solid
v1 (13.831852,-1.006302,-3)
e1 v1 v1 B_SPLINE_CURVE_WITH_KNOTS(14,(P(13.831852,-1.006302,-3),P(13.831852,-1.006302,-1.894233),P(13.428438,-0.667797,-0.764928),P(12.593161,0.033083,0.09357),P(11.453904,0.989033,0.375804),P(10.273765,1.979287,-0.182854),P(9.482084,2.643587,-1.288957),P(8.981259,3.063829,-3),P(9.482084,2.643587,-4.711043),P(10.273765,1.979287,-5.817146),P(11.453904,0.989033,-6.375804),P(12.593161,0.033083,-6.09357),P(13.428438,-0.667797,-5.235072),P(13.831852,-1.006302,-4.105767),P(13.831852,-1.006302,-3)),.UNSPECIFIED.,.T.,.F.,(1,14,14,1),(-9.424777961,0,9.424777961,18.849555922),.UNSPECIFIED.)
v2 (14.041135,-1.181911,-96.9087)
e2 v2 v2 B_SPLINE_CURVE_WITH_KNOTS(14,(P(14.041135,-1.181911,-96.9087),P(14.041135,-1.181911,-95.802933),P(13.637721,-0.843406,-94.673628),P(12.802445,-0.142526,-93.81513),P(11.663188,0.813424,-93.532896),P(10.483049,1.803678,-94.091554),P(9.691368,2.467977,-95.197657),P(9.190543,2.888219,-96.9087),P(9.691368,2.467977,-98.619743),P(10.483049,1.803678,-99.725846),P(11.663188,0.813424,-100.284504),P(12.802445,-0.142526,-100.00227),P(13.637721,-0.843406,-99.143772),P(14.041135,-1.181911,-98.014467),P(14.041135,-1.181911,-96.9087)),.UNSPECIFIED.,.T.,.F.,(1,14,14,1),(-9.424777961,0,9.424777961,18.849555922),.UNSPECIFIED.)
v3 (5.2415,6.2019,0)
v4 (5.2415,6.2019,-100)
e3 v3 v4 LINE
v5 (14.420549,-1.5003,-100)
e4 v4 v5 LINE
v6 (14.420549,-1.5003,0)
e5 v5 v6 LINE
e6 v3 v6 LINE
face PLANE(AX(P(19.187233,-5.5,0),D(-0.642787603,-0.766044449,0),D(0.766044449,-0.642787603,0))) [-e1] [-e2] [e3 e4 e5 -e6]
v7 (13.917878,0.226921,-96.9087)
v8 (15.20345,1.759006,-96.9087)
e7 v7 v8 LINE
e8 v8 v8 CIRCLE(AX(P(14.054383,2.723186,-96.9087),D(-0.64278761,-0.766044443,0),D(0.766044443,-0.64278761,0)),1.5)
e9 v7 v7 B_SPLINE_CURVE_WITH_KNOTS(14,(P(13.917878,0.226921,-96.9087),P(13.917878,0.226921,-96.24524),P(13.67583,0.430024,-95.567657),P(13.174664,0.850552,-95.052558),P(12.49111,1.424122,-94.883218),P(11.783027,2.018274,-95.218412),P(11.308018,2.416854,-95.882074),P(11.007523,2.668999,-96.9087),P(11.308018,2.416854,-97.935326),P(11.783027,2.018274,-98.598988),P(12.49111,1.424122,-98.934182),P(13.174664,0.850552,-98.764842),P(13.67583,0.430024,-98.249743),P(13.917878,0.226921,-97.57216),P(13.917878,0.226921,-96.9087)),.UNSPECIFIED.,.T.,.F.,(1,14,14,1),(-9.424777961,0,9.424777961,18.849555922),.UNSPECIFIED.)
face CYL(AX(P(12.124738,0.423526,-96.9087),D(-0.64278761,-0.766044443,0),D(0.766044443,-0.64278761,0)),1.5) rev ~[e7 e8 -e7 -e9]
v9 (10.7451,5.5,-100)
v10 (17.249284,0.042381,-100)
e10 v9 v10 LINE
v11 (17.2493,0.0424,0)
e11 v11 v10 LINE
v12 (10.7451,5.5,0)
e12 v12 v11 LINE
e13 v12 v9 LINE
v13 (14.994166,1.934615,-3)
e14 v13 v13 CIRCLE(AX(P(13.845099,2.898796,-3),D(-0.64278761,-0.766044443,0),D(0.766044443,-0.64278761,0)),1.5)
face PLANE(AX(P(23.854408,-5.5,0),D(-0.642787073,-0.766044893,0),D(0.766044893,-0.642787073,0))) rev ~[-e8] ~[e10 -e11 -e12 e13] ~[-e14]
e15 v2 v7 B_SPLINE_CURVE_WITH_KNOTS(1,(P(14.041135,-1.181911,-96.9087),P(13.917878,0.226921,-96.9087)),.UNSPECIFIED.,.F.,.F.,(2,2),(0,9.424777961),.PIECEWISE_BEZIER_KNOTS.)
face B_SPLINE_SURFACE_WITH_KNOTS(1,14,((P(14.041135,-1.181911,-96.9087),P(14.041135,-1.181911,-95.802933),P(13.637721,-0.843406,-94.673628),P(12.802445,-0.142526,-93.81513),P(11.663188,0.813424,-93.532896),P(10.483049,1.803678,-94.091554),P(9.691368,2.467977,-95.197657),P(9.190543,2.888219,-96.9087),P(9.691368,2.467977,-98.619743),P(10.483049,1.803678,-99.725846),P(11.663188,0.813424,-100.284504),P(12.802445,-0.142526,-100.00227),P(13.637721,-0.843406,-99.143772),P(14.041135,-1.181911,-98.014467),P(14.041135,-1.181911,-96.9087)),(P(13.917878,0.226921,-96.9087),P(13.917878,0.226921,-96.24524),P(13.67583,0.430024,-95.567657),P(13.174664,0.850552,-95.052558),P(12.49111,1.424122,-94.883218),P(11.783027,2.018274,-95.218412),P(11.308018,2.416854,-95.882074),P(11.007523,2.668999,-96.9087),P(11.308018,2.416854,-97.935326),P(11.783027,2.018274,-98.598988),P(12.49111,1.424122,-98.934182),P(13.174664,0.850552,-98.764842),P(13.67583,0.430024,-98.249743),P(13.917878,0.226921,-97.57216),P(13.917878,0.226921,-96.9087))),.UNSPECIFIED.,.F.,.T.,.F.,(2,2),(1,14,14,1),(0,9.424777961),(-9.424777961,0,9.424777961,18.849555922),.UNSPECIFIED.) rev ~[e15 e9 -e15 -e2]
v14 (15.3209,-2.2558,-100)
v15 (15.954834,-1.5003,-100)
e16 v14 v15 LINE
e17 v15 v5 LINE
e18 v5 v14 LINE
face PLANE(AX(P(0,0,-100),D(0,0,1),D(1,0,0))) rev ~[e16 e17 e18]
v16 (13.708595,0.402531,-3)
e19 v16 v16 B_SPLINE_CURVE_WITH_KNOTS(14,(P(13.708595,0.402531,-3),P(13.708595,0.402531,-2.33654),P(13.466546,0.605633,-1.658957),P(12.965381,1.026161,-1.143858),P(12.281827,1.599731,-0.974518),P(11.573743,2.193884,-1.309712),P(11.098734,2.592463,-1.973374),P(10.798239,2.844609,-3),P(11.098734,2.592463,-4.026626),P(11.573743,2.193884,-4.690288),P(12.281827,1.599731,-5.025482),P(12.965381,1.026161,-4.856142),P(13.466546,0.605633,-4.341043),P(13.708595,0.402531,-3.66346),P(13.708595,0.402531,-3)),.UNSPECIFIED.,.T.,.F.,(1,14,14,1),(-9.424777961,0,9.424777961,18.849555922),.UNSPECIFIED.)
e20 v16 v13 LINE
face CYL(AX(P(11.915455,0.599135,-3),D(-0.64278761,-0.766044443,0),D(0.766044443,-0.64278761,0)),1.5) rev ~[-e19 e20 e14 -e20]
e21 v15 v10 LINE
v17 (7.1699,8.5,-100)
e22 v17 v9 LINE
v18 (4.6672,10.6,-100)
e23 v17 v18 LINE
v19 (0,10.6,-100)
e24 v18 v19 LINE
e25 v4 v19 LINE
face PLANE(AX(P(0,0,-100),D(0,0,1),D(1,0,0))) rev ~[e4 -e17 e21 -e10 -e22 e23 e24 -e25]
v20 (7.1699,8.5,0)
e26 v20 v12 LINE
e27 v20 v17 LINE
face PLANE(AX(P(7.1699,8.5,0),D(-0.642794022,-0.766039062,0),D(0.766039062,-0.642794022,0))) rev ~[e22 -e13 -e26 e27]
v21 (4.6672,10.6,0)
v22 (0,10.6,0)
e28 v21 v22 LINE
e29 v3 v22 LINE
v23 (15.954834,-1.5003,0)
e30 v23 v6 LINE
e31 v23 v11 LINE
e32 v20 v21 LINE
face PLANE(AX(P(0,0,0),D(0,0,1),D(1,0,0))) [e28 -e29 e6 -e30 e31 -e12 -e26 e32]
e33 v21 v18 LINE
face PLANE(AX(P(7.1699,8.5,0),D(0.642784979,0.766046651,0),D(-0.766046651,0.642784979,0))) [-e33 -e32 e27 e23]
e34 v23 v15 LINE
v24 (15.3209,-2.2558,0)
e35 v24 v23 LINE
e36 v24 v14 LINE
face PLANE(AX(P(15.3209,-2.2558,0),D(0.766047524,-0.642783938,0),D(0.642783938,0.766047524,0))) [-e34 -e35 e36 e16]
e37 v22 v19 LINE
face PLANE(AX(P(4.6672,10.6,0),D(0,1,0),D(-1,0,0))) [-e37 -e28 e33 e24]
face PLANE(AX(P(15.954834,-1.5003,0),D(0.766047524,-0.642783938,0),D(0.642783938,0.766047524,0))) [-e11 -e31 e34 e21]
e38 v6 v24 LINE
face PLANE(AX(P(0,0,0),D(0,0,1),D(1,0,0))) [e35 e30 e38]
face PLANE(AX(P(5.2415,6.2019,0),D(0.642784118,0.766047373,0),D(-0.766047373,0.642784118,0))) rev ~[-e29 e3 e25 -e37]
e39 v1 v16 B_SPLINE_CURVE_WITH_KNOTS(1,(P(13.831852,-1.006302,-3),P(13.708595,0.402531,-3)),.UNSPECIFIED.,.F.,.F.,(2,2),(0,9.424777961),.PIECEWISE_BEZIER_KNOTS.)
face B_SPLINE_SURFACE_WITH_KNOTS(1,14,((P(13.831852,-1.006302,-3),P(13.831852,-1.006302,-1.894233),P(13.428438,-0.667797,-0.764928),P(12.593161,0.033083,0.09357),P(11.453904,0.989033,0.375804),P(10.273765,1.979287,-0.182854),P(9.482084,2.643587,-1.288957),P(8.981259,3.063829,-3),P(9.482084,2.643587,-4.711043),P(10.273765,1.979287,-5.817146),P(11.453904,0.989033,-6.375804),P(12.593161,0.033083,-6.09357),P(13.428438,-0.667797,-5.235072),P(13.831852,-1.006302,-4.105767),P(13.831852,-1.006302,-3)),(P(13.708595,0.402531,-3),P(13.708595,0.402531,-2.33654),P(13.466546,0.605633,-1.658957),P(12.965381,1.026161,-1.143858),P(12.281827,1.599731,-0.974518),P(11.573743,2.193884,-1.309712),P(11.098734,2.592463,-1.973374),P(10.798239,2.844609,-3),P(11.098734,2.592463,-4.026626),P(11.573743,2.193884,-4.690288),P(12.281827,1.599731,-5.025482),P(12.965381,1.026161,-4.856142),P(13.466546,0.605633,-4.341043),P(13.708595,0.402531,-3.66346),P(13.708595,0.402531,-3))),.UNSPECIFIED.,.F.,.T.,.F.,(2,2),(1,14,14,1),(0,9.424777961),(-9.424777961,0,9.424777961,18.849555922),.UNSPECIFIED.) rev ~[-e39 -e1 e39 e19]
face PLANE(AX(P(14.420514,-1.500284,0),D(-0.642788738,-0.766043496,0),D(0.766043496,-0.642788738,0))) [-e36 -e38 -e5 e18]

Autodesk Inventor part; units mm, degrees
ref_plane "YZ Plane" through (0, 0, 0) normal (1, 0, 0) x (0, 1, 0)
sketch "Sketch1" plane through (0, 0, 0) normal (0, 0, 1) x (1, 0, 0)
  line L0 (10.7451, 5.5) -> (50.1922, -27.6) projected
  line L1 (50.1922, -27.6) -> (100, -27.6) projected
  line L2 (100, -27.6) -> (100, -23.6) projected
  line L3 (100, -23.6) -> (83.9, -23.6) projected
  arc A0 (65.8, -5.5) -> (83.9, -23.6) centre (83.9, -5.5) ccw projected
  line L4 (65.8, -5.5) -> (65.8, 5.5) projected
  line L5 (65.8, 5.5) -> (10.7451, 5.5) projected
  line L6 (7.1699, 8.5) -> (10.7451, 5.5) projected
  line L7 (65.8, 5.5) -> (10.7451, 5.5) projected
  line L8 (65.8, 5.5) -> (65.8, 8.5) projected
  line L9 (65.8, 8.5) -> (7.1699, 8.5) projected
  circle A1 centre (83.9, -5.5) radius 16.1 projected
  line L10 (83.9, 10.6) -> (-17.1951, 10.6)
  line L11 (100, -5.5) -> (0, -5.5)
  line L12 (0, -5.5) -> (0, 10.6)
  line L13 (7.1699, 8.5) -> (4.6672, 10.6)
  line L14 (7.1699, 8.5) -> (5.2415, 6.2019)
  line L15 (5.2415, 6.2019) -> (0, 10.6)
  line L16 (0, 10.6) -> (22.9813, -8.6836)
  line L17 (22.9813, -8.6836) -> (24.9097, -6.3855)
  point P0 (0, 0)
  dimension "d0" = 100
  dimension "d1" = 3
  dimension "d2" = 30
extrude "Extrusion1" add sketch "Sketch1" against normal blind 100 contours L17 L16 L11 L0 | L11 L16 L14 L6 L0 | L14 L15 L10 L13
ref_plane "Work Plane1" through (8.1777, -6.0133, 8.6215) normal (0, -1, 0) x (0, 0, 1)
sketch "Sketch2" plane through (8.1777, -6.0133, 8.6215) normal (0, -1, 0) x (0, 0, 1)
  line L0 (-22.0032, -27.7487) -> (35.8312, 20.7819)
  line L1 (35.8312, 20.7819) -> (3.0626, 38.2053)
  line L2 (3.0626, 38.2053) -> (-26.1922, -24.5344)
  line L3 (-26.1922, -24.5344) -> (-22.0032, -27.7487)
  line L4 (-46.8404, -23.7111) -> (-15.3118, 43.9022)
  line L5 (-15.3118, 43.9022) -> (-51.9953, 38.492)
  line L6 (-51.9953, 38.492) -> (-51.9953, -22.5683)
  line L7 (-51.9953, -22.5683) -> (-46.8404, -23.7111)
  line L8 (-70.2281, -23.6979) -> (-65.0733, -22.5551)
  line L9 (-65.0733, -22.5551) -> (-65.0733, 38.4893)
  line L10 (-94.9551, 29.3293) -> (-70.2281, -23.6979)
  line L11 (-65.0733, 38.4893) -> (-94.9551, 29.3293)
  line L12 (-90.9709, -24.4596) -> (-115.5317, 28.2112)
  arc A0 (-115.5317, 28.2112) -> (-139.4308, 9.4739) centre (-87.2125, -32.5195) ccw
  line L13 (-139.4308, 9.4739) -> (-95.1598, -27.6739)
  line L14 (-95.1598, -27.6739) -> (-90.9709, -24.4596)
  point P0 (-8.6215, 8.1777)
  point P1 (-24.0977, -26.1415)
  point P2 (-49.4178, -23.1397)
  point P3 (-67.6507, -23.1265)
  point P4 (-93.0654, -26.0667)
ref_plane "Work Plane2" through (40.3431, -2.6133, -6) normal (0, -1, 0) x (1, 0, 0)
extrude "Extrusion2" cut sketch "Sketch2" against normal up to surface (3.4 mm away)
extrude "Extrusion3" cut sketch "Sketch2" along normal blind 1
sketch "Sketch3" plane through (15.747, -2.6133, 0) normal (0, -1, 0) x (1, 0, 0)
  line L0 (4.6672, 0) -> (4.6672, -11.8362) projected
  line L1 (0, 0) -> (4.6672, 0) projected
  line L2 (0, -9.66) -> (0, 0) projected
  line L3 (4.6672, -11.8362) -> (0, -9.66) projected
  line L4 (4.6672, -32.8682) -> (4.6672, -43.3737) projected
  line L5 (0, -30.6918) -> (4.6672, -32.8682) projected
  line L6 (0, -43.3737) -> (0, -30.6918) projected
  line L7 (4.6672, -43.3737) -> (0, -43.3737) projected
  line L8 (4.6672, -56.4518) -> (4.6672, -66.9512) projected
  line L9 (0, -56.4518) -> (4.6672, -56.4518) projected
  line L10 (0, -69.1275) -> (0, -56.4518) projected
  line L11 (4.6672, -66.9512) -> (0, -69.1275) projected
  line L12 (4.6672, -88.0491) -> (4.6672, -100) projected
  line L13 (0, -90.2254) -> (4.6672, -88.0491) projected
  line L14 (0, -100) -> (0, -90.2254) projected
  line L15 (4.6672, -100) -> (0, -100) projected
  line L16 (0, -90.2254) -> (12.0968, -84.5846)
  line L17 (0, -90.2254) -> (4.6672, -88.0491) projected
  line L18 (12.0968, -84.5846) -> (12.0968, -100)
  line L19 (4.6672, -100) -> (0, -100) projected
  line L20 (12.0968, -100) -> (0, -100)
  line L21 (8.636, -100) -> (8.636, -86.1984) projected
  line L22 (8.636, -86.1984) -> (9.1627, -85.9528) projected
  line L23 (9.1627, -64.8548) -> (9.1627, -85.9528) projected
  line L24 (9.1627, -64.8548) -> (8.636, -65.1005) projected
  line L25 (8.636, -65.1005) -> (8.636, -56.4518) projected
  line L26 (8.636, -56.4518) -> (9.1627, -56.4518) projected
  line L27 (9.1627, -43.3737) -> (9.1627, -56.4518) projected
  line L28 (9.1627, -43.3737) -> (8.636, -43.3737) projected
  line L29 (8.636, -43.3737) -> (8.636, -34.7188) projected
  line L30 (8.636, -34.7188) -> (9.1627, -34.9645) projected
  line L31 (9.1627, -13.9325) -> (9.1627, -34.9645) projected
  line L32 (9.1627, -13.9325) -> (8.636, -13.6868) projected
  line L33 (8.636, -13.6868) -> (8.636, 0) projected
  line L34 (7.2344, 0) -> (8.636, 0) projected
  line L35 (7.2344, 0) -> (7.2344, -100) projected
  line L36 (8.636, -100) -> (7.2344, -100) projected
  line L37 (0, -30.6918) -> (5.2437, -33.137) projected
  line L38 (5.2437, -33.137) -> (5.2437, -43.3737) projected
  line L39 (5.2437, -43.3737) -> (0, -43.3737) projected
  line L40 (0, -43.3737) -> (0, -30.6918) projected
  line L41 (5.2437, -66.6823) -> (0, -69.1275) projected
  line L42 (0, -69.1275) -> (0, -56.4518) projected
  line L43 (0, -56.4518) -> (5.2437, -56.4518) projected
  line L44 (5.2437, -56.4518) -> (5.2437, -66.6823) projected
  line L45 (5.2437, -87.7803) -> (5.2437, -100) projected
  line L46 (7.2344, -100) -> (5.2437, -100) projected
  line L47 (7.2344, 0) -> (7.2344, -100) projected
  line L48 (5.2437, 0) -> (7.2344, 0) projected
  line L49 (5.2437, 0) -> (5.2437, -12.1051) projected
  line L50 (5.2437, -12.1051) -> (0, -9.66) projected
  line L51 (0, -9.66) -> (0, 0) projected
  line L52 (-15.747, 0) -> (0, 0) projected
  line L53 (-15.747, 0) -> (-15.747, -100) projected
  line L54 (0, -100) -> (-15.747, -100) projected
  line L55 (0, -100) -> (0, -90.2254) projected
  line L56 (0, -90.2254) -> (5.2437, -87.7803) projected
  line L57 (4.6672, -66.9512) -> (0, -69.1275) projected
  line L58 (0, -69.1275) -> (9.1627, -64.8548)
  line L59 (9.1627, -56.4518) -> (4.6672, -56.4518) projected
  line L60 (9.1627, -56.4518) -> (9.1627, -64.8548)
  line L61 (0, -56.4518) -> (9.1627, -56.4518)
  line L62 (0, -43.3737) -> (9.1627, -43.3737)
  line L63 (8.636, -34.7188) -> (9.1627, -34.9645) projected
  line L64 (9.1627, -34.9645) -> (9.1627, -43.3737)
  line L65 (8.636, -43.3737) -> (8.636, -34.7188) projected
  line L66 (0, -30.6918) -> (4.6672, -32.8682) projected
  line L67 (0, -30.6918) -> (9.1627, -34.9645)
  line L68 (4.6672, -11.8362) -> (0, -9.66) projected
  line L69 (4.6672, -11.8362) -> (9.1627, -13.9325)
  line L70 (9.1627, -13.9325) -> (9.1627, 0)
  line L71 (9.1627, 0) -> (0, 0)
  line L72 (4.6672, 0) -> (-11.0798, 0) projected
  line L73 (8.9504, 0) -> (9.1627, -0.253) projected
  line L74 (9.1627, 0) -> (9.1627, -0.253) projected
  line L75 (8.9504, 0) -> (9.1627, 0) projected
  line L76 (9.1627, -99.5783) -> (8.8088, -100) projected
  line L77 (9.1627, -100) -> (8.8088, -100) projected
  line L78 (9.1627, -99.5783) -> (9.1627, -100) projected
  point P0 (-15.747, 0)
  point P1 (8.9504, 0)
  point P2 (5.2437, -12.1051)
  point P3 (7.2344, 0)
  point P4 (5.2437, -33.137)
  point P5 (5.2437, -43.3737)
  point P6 (5.2437, -66.6823)
  point P7 (5.2437, -87.7803)
  point P8 (5.2437, -100)
  point P9 (8.636, -100)
  point P10 (8.636, -86.1984)
extrude "Extrusion4" cut sketch "Sketch3" along normal through all contours L48 L35 L69 L49 | L34 L33 L69 L35 | L67 L29 L62 L35 | L35 L62 L38 L67 | L71 L70 L73 | L59 L25 L58 L35 | L35 L58 L44 L59 | L45 L16 L35 L20 | L16 L21 L20 L35 | L76 L78 L20
sketch "Sketch4" plane through (0, 10.6, -100) normal (-0.6427876, -0.7660444, 0) x (0.7660444, -0.6427876, 0)
  line L0 (30, 34.2459) -> (20.5562, 30.8725) projected
  line L1 (20.5562, 30.8725) -> (20.5562, 43.5482) projected
  line L2 (20.5562, 43.5482) -> (30, 43.5482) projected
  line L3 (30, 56.6263) -> (30, 43.5482) projected
  line L4 (30, 56.6263) -> (20.5562, 56.6263) projected
  line L5 (20.5562, 56.6263) -> (20.5562, 69.3082) projected
  line L6 (20.5562, 69.3082) -> (30, 65.9347) projected
  line L7 (30, 86.9667) -> (30, 65.9347) projected
  line L8 (30, 86.9667) -> (20.5562, 90.34) projected
  line L9 (20.5562, 90.34) -> (20.5562, 100) projected
  line L10 (0, 100) -> (20.5562, 100) projected
  line L11 (0, 100) -> (0, 0) projected
  line L12 (20.5562, 0) -> (0, 0) projected
  line L13 (20.5562, 0) -> (20.5562, 9.7746) projected
  line L14 (20.5562, 9.7746) -> (30, 13.148) projected
  line L15 (30, 34.2459) -> (30, 13.148) projected
  line L16 (73.894, 94) -> (30.9766, 94)
  line L17 (24.1315, 94) -> (11.5095, 94)
  line L18 (31.2695, 94) -> (24.1315, 94)
  line L19 (0, 100) -> (0, 0) projected
  line L20 (0, 50) -> (30, 50.0873)
  line L21 (20.5562, 100) -> (18.5562, 100)
  line L22 (18.5562, 100) -> (18.5562, 94)
  line L23 (18.5562, 94) -> (20.5562, 94)
  line L24 (20.5562, 94) -> (20.5562, 100)
  circle A0 centre (15.5562, 97) radius 3
  circle A1 centre (15.5562, 97) radius 1.5
  circle A2 centre (15.8294, 3.0913) radius 1.5
  point P0 (6.8135, 100)
  dimension "d11" = 2
  dimension "d12" = 3
extrude "Extrusion5" cut sketch "Sketch4" against normal blind 10 contours A1 | A2
chamfer "Chamfer1" distance 1 angle 45 2 edges at (10.9769, 1.3893, -96.9087) (10.7677, 1.5648, -3)
sketch "Szkic5" plane through (15.747, -2.6133, 0) normal (0, -1, 0) x (1, 0, 0)
  line L0 (4.6672, 0) -> (4.6672, -11.8362) projected
  line L1 (0, 0) -> (4.6672, 0) projected
  line L2 (0, -9.66) -> (0, 0) projected
  line L3 (4.6672, -11.8362) -> (0, -9.66) projected
  line L4 (4.6672, -32.8682) -> (4.6672, -43.3737) projected
  line L5 (0, -30.6918) -> (4.6672, -32.8682) projected
  line L6 (0, -43.3737) -> (0, -30.6918) projected
  line L7 (4.6672, -43.3737) -> (0, -43.3737) projected
  line L8 (4.6672, -56.4518) -> (4.6672, -66.9512) projected
  line L9 (0, -56.4518) -> (4.6672, -56.4518) projected
  line L10 (0, -69.1275) -> (0, -56.4518) projected
  line L11 (4.6672, -66.9512) -> (0, -69.1275) projected
  line L12 (4.6672, -88.0491) -> (4.6672, -100) projected
  line L13 (0, -90.2254) -> (4.6672, -88.0491) projected
  line L14 (0, -100) -> (0, -90.2254) projected
  line L15 (4.6672, -100) -> (0, -100) projected
  line L16 (4.6672, 0) -> (4.6672, -11.8362) projected
  line L17 (4.6672, 0) -> (-31.1129, 0)
  line L18 (-31.1129, 0) -> (-31.1129, -100)
  line L19 (-31.1129, -100) -> (4.6672, -100)
  line L20 (4.6672, -100) -> (4.6672, 0)
  line L21 (4.6672, -100) -> (0, -100) projected
  line L22 (4.6672, 0) -> (-11.0798, 0) projected
  line L23 (4.6672, 0) -> (18.0688, 0)
  line L24 (18.0688, 0) -> (18.0688, -100)
  line L25 (18.0688, -100) -> (4.6672, -100)
  line L26 (4.6672, -100) -> (4.6672, 0)
  point P0 (-15.747, 0)
  point P1 (4.6672, -100)
extrude "Wyciągnięcie proste6" cut sketch "Szkic5" along normal blind 10
ref_plane "Płaszczyzna konstrukcyjna3" through (19.0877, -1.5003, -6) normal (0, -1, 0) x (1, 0, 0)
extrude "Wyciągnięcie proste7" cut sketch "Szkic5" against normal up to surface (1.113 mm away)
sketch "Szkic6" plane through (0, 0, 0) normal (0, 0, 1) x (1, 0, 0)
  line L0 (14.4205, -1.5003) -> (19.0877, -1.5003) projected
  line L1 (19.0877, -1.5003) -> (4.6672, 10.6) projected
  line L2 (4.6672, 10.6) -> (0, 10.6) projected
  line L3 (0, 10.6) -> (14.4205, -1.5003) projected
  line L4 (0, 10.6) -> (15.3209, -2.2558)
  line L5 (15.3209, -2.2558) -> (17.2493, 0.0424)
  line L6 (19.0877, -1.5003) -> (4.6672, 10.6) projected
  point P0 (0, 0)
  point P1 (15.9548, -1.5003)
  dimension "d22" = 20
extrude "Wyciągnięcie proste8" cut sketch "Szkic6" against normal through all contours L5 L1 L0
extrude "Wyciągnięcie proste9" add sketch "Szkic6" against normal up to surface (100 mm away) contours L0 L5 L4
properties part number "strug" material "Steel, Alloy"
